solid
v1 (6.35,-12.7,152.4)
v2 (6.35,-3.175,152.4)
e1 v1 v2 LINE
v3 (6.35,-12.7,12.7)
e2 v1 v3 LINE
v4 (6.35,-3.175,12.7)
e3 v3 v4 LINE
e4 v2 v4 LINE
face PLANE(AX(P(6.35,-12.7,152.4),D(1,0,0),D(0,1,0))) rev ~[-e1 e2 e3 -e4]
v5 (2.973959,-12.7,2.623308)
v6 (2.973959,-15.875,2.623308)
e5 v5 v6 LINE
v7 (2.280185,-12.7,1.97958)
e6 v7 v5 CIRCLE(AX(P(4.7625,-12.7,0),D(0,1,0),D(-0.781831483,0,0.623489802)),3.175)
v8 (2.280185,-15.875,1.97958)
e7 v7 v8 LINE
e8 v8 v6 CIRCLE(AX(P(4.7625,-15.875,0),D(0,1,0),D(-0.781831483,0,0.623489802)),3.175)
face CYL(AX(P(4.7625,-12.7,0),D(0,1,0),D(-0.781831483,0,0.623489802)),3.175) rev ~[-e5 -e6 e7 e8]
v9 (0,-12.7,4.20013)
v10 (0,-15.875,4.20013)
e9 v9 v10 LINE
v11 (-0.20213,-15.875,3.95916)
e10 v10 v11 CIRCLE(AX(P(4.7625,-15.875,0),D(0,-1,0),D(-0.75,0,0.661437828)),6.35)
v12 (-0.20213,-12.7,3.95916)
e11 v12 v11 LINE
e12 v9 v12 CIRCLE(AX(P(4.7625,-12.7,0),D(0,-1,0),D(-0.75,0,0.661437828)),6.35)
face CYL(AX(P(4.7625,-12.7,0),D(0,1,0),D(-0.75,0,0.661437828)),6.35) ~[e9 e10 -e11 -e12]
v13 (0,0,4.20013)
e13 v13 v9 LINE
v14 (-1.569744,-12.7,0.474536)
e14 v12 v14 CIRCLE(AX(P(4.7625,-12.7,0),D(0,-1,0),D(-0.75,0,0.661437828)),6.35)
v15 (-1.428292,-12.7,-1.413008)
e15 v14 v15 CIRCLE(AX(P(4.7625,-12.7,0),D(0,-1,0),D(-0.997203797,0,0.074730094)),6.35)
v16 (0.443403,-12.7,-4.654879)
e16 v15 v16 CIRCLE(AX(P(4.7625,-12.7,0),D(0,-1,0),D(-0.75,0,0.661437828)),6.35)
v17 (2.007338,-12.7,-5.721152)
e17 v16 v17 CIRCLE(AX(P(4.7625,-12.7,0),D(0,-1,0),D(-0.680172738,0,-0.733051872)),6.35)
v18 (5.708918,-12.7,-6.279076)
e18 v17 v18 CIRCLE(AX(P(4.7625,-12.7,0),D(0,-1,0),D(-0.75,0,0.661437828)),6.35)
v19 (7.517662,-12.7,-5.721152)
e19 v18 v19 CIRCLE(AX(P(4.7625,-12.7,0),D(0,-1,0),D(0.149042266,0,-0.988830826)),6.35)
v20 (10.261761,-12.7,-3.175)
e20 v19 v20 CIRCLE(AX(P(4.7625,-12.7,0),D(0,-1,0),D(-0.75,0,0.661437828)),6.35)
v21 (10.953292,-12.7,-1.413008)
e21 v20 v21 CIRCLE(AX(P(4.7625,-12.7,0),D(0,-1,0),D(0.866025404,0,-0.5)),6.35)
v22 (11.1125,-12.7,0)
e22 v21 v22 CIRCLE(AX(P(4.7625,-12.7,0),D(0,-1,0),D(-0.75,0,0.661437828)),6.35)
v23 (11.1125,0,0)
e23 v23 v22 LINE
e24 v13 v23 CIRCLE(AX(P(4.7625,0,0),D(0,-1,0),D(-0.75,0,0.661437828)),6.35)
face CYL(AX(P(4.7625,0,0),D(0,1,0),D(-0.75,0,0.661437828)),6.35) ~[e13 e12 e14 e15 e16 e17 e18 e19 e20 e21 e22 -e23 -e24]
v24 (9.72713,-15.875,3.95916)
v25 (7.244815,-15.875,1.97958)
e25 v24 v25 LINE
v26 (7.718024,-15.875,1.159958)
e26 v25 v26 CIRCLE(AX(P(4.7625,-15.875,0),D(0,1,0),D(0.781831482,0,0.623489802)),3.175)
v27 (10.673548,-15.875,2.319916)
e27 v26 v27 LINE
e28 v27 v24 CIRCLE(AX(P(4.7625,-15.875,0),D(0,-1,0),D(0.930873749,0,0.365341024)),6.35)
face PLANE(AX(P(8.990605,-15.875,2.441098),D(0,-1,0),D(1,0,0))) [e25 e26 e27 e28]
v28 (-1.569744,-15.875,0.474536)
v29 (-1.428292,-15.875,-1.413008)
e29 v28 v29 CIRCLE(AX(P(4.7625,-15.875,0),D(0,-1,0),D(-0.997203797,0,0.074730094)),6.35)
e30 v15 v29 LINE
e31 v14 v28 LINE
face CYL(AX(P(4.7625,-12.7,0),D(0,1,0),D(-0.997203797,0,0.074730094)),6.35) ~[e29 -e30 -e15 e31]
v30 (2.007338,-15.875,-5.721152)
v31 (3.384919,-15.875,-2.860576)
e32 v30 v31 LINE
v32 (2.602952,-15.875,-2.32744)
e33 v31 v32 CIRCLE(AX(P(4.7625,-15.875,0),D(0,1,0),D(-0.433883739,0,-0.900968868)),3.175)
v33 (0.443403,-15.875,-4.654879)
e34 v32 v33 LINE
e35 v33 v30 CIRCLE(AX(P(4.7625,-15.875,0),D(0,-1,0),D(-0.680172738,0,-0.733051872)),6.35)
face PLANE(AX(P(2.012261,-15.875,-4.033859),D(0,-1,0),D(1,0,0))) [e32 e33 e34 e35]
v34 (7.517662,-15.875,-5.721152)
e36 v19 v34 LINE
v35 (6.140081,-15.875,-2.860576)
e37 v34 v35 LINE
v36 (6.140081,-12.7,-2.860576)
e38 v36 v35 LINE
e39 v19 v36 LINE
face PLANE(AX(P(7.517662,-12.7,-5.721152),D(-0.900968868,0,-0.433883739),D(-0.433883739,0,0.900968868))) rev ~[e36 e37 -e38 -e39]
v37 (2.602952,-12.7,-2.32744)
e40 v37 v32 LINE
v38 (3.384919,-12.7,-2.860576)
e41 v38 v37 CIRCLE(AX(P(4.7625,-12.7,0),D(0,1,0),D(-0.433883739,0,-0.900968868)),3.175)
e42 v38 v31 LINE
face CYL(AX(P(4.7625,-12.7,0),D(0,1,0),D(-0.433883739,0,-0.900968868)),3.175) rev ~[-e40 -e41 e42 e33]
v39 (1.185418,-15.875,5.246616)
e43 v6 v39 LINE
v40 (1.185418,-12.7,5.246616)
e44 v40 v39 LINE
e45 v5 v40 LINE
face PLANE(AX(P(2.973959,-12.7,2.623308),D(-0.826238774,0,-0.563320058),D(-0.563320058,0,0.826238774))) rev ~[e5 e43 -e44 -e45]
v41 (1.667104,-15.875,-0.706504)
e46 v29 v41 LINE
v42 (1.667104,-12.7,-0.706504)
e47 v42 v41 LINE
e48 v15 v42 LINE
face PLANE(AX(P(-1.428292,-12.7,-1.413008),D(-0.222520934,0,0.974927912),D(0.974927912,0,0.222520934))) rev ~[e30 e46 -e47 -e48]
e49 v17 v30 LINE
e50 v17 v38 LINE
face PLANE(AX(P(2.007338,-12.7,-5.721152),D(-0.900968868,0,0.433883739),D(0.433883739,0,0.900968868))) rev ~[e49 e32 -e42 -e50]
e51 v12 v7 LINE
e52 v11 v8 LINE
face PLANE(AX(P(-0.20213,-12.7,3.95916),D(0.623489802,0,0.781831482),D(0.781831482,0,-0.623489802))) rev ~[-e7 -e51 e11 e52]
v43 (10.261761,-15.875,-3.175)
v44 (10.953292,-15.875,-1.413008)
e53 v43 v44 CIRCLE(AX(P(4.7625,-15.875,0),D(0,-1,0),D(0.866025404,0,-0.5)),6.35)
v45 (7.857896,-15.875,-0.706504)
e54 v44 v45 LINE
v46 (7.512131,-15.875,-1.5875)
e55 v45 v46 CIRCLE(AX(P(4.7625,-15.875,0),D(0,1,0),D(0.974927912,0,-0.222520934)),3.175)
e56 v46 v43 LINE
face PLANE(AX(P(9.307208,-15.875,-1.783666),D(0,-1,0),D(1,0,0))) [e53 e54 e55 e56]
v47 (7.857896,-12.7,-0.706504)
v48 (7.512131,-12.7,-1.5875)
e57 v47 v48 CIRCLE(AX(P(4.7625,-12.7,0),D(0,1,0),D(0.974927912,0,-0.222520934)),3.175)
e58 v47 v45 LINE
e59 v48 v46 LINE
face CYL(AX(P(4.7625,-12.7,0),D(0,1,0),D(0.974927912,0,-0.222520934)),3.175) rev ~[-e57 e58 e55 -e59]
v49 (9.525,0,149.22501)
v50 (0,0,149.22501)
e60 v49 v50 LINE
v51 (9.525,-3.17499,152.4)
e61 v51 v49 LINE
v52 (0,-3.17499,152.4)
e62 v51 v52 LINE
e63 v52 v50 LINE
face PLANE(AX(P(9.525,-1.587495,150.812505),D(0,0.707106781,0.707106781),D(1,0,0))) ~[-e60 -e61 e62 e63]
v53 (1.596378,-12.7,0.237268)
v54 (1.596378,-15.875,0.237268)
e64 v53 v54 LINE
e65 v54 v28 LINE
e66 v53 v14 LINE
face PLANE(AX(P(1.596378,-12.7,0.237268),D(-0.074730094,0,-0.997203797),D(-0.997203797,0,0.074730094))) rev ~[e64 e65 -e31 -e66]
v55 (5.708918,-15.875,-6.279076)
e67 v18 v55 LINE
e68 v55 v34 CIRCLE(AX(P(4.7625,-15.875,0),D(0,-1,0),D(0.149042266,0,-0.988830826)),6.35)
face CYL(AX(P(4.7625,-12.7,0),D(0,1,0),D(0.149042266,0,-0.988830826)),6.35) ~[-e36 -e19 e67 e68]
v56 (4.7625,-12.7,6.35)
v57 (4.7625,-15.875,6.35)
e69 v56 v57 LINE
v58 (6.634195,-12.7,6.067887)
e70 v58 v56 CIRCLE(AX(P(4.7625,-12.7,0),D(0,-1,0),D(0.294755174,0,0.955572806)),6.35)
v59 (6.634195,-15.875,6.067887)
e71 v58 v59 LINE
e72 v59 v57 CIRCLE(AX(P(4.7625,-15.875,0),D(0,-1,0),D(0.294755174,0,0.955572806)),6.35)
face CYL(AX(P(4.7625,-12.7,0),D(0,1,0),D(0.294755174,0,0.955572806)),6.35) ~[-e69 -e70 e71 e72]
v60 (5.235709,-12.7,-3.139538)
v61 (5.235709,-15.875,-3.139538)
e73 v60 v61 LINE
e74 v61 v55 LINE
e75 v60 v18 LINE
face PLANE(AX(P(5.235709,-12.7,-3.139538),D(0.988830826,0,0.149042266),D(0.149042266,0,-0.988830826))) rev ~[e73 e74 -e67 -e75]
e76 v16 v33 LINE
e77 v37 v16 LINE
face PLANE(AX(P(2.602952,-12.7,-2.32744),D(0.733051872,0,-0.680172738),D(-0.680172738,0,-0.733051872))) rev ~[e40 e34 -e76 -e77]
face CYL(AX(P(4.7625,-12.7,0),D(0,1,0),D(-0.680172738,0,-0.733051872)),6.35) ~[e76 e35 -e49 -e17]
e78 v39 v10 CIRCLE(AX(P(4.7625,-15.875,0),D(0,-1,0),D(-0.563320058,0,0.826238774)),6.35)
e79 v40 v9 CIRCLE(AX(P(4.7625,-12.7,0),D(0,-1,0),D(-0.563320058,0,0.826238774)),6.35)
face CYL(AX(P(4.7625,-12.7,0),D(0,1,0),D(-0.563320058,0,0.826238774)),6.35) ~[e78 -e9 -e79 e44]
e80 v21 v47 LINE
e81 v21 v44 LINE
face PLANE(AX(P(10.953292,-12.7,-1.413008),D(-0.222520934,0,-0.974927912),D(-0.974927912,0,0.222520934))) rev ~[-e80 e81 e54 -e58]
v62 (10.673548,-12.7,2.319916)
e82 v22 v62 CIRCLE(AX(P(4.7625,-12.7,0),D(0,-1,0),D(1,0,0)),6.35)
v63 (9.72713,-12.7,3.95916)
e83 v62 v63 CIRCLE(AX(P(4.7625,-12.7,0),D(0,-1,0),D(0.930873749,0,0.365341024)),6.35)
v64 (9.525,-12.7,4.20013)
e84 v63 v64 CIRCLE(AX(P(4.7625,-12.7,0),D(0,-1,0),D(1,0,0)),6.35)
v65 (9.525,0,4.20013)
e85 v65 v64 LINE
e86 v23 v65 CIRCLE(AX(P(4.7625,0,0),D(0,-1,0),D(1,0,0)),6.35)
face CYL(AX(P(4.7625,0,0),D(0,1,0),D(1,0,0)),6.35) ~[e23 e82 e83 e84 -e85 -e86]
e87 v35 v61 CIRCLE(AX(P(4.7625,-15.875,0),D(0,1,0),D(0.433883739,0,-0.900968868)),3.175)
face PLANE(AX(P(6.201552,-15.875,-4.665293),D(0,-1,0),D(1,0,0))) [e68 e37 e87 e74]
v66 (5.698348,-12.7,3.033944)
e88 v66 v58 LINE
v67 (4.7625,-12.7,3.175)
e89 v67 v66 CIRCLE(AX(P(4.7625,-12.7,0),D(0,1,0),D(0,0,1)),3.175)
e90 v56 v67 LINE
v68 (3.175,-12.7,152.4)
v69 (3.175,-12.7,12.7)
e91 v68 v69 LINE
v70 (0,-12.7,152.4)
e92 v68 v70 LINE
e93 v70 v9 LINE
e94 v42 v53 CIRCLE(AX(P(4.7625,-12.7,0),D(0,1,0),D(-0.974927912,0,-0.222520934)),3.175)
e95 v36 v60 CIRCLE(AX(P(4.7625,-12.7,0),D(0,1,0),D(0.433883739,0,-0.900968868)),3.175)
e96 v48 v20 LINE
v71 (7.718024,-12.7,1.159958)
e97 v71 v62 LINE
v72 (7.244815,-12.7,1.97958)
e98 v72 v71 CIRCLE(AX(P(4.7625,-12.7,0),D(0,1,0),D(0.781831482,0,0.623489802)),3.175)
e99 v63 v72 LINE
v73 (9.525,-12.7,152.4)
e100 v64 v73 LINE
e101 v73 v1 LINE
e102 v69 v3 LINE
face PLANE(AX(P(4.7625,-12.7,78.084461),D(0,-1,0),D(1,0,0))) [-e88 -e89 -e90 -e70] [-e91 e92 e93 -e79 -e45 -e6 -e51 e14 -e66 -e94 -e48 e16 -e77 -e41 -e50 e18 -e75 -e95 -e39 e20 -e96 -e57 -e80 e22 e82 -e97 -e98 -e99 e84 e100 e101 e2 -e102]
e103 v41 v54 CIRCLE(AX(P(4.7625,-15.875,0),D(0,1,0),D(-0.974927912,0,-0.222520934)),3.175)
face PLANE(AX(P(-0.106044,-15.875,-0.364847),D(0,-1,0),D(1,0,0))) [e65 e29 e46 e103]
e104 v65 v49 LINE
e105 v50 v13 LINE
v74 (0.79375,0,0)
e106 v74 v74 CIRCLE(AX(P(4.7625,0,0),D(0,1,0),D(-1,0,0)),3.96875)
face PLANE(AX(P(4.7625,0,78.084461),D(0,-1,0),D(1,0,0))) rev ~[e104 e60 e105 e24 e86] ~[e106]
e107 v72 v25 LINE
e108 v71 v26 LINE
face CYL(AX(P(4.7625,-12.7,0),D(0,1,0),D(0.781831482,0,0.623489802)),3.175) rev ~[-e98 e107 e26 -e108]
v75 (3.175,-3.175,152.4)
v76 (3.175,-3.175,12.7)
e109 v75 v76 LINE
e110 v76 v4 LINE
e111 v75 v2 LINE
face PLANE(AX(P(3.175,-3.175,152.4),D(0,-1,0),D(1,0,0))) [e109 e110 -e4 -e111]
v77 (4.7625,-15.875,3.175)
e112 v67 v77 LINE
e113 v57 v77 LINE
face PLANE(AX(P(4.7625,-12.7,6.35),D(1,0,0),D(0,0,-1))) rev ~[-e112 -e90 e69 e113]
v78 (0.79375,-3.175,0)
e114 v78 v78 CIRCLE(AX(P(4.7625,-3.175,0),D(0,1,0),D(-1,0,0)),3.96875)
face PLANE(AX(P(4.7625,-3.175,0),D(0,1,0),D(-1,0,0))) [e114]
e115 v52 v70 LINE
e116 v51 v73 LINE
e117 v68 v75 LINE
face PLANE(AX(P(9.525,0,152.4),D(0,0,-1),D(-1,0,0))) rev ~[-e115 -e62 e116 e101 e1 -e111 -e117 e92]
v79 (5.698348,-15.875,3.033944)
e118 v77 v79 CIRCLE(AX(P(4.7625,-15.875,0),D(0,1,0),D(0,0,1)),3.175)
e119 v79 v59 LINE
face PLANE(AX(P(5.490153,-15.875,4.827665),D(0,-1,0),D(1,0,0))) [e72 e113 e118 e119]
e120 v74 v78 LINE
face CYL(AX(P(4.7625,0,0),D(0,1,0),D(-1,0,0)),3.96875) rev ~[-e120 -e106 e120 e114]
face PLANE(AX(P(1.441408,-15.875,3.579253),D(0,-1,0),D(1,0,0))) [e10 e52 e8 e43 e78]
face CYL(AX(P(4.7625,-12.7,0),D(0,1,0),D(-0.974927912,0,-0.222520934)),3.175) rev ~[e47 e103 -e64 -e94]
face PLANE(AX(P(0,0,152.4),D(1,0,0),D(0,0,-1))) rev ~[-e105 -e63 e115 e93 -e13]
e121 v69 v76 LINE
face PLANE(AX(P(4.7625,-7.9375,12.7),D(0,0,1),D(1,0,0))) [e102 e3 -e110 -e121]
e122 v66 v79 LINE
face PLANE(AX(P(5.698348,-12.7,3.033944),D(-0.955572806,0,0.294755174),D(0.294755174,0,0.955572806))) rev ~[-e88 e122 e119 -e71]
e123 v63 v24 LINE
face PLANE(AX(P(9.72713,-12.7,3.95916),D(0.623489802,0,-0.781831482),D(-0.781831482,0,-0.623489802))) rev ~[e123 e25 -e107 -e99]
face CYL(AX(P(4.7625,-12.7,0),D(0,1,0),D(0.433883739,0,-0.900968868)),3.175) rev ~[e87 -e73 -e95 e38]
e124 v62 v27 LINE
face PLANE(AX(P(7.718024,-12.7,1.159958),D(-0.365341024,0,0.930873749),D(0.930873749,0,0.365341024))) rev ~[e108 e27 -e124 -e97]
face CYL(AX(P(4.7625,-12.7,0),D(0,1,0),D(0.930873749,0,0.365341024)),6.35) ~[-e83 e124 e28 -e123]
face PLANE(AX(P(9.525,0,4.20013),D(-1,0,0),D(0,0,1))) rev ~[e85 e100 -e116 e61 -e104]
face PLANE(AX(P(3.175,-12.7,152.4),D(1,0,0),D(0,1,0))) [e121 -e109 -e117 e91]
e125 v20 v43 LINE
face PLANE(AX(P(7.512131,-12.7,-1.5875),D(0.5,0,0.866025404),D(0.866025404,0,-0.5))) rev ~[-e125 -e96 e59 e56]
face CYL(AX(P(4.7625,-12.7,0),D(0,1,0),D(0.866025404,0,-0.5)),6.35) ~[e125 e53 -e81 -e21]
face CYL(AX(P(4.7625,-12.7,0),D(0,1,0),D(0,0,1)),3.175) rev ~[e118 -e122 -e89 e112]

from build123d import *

# Parameters (mm, degrees)
F1_DEPTH = 12.7
F2_W     = 3.175
F2_H     = 9.525
F3_DEPTH = 139.7
F5_DEPTH = 3.175
F6_R     = 3.96875
F7_DEPTH = 3.175
F8_SIZE  = 3.17499


# Not quite as in the source:
# - a fillet or chamfer is up to 0.001 mm smaller than in the source, because OpenCascade refuses the exact size


with BuildPart() as f1:
    # F0 (on Front) → F1 (new body)
    with BuildSketch(Plane.XZ):
        with BuildLine():
            Line((0, 152.4), (0, 4.2001302063))
            ThreePointArc((0, 4.2001302063), (4.7625, 6.35), (9.525, 4.2001302063))
            Line((9.525, 4.2001302063), (9.525, 152.4))
            Line((9.525, 152.4), (0, 152.4))
        make_face()
        with BuildLine():
            Line((0, 4.2001302063), (0, 0))
            Line((0, 0), (9.525, 0))
            Line((9.525, 0), (9.525, 4.2001302063))
            ThreePointArc((9.525, 4.2001302063), (4.7625, 6.35), (0, 4.2001302063))
        make_face()
        with BuildLine():
            Line((9.525, 0), (0, 0))
            Line((0, 0), (0, 4.2001302063))
            ThreePointArc((0, 4.2001302063), (2.5174359697, -5.9398811015), (11.1125, 0))
            ThreePointArc((11.1125, 0), (10.7023811015, 2.2450640303), (9.525, 4.2001302063))
            Line((9.525, 4.2001302063), (9.525, 0))
        make_face()
    extrude(amount=F1_DEPTH)

    # F2 (on face) → F3 (cut)
    with BuildSketch(Plane.XY.offset(152.4)):
        with Locations((4.7625, -7.9375)):
            Rectangle(F2_W, F2_H)
    extrude(amount=-F3_DEPTH, mode=Mode.SUBTRACT)

    # F4 (on face) → F5 (join)
    with BuildSketch(Plane.XZ.offset(12.7)):
        with BuildLine():
            Line((5.2357091951, -3.1395378733), (5.7089183902, -6.2790757465))
            ThreePointArc((5.7089183902, -6.2790757465), (6.6341953575, -6.0678873167), (7.5176617434, -5.7211523112))
            Line((7.5176617434, -5.7211523112), (6.1400808717, -2.8605761556))
            ThreePointArc((6.1400808717, -2.8605761556), (5.6983476788, -3.0339436584), (5.2357091951, -3.1395378733))
        make_face()
        with BuildLine():
            Line((2.6029515576, -2.3274396931), (0.4434031152, -4.6548793861))
            ThreePointArc((0.4434031152, -4.6548793861), (1.1854176313, -5.2466162169), (2.0073382566, -5.7211523112))
            Line((2.0073382566, -5.7211523112), (3.3849191283, -2.8605761556))
            ThreePointArc((3.3849191283, -2.8605761556), (2.9739588156, -2.6233081085), (2.6029515576, -2.3274396931))
        make_face()
        with BuildLine():
            Line((1.5963779439, 0.2372680471), (-1.5697441121, 0.4745360943))
            ThreePointArc((-1.5697441121, 0.4745360943), (-1.5697441121, -0.4745360943), (-1.4282922424, -1.4130079306))
            Line((-1.4282922424, -1.4130079306), (1.6671038788, -0.7065039653))
            ThreePointArc((1.6671038788, -0.7065039653), (1.5963779439, -0.2372680471), (1.5963779439, 0.2372680471))
        make_face()
        with BuildLine():
            ThreePointArc((2.2801850432, 1.9795801209), (2.6029515576, 2.3274396931), (2.9739588156, 2.6233081085))
            Line((2.9739588156, 2.6233081085), (1.1854176313, 5.2466162169))
            ThreePointArc((1.1854176313, 5.2466162169), (0.5600076724, 4.760415763), (0, 4.2001302063))
            ThreePointArc((0, 4.2001302063), (-0.1025571138, 4.080896872), (-0.2021299137, 3.9591602418))
            Line((-0.2021299137, 3.9591602418), (2.2801850432, 1.9795801209))
        make_face()
        with BuildLine():
            Line((4.7625, 6.35), (4.7625, 3.175))
            ThreePointArc((4.7625, 3.175), (5.2357091951, 3.1395378733), (5.6983476788, 3.0339436584))
            Line((5.6983476788, 3.0339436584), (6.6341953575, 6.0678873167))
            ThreePointArc((6.6341953575, 6.0678873167), (5.7089183902, 6.2790757465), (4.7625, 6.35))
        make_face()
        with BuildLine():
            ThreePointArc((10.6735483039, 2.3199155047), (10.261761314, 3.175), (9.7271299137, 3.9591602418))
            Line((9.7271299137, 3.9591602418), (7.2448149568, 1.9795801209))
            ThreePointArc((7.2448149568, 1.9795801209), (7.512130657, 1.5875), (7.7180241519, 1.1599577524))
            Line((7.7180241519, 1.1599577524), (10.6735483039, 2.3199155047))
        make_face()
        with BuildLine():
            Line((7.512130657, -1.5875), (10.261761314, -3.175))
            ThreePointArc((10.261761314, -3.175), (10.6735483039, -2.3199155047), (10.9532922424, -1.4130079306))
            Line((10.9532922424, -1.4130079306), (7.8578961212, -0.7065039653))
            ThreePointArc((7.8578961212, -0.7065039653), (7.7180241519, -1.1599577524), (7.512130657, -1.5875))
        make_face()
    extrude(amount=F5_DEPTH)

    # F6 (on face) → F7 (cut)
    with BuildSketch(Plane(origin=(0, 0, 0), x_dir=(-1, 0, 0), z_dir=(0, 1, 0))):
        with Locations((-4.7625, 0)):
            Circle(F6_R)
    extrude(amount=-F7_DEPTH, mode=Mode.SUBTRACT)

    # F8 (size 3.175 in the source; OpenCascade refuses exactly that, so slightly less here)
    f8_edges = [f1.edges().sort_by_distance(p)[0] for p in [
        (4.7625, 0, 152.4),
    ]]
    chamfer(f8_edges, length=F8_SIZE)


solid = f1.part
